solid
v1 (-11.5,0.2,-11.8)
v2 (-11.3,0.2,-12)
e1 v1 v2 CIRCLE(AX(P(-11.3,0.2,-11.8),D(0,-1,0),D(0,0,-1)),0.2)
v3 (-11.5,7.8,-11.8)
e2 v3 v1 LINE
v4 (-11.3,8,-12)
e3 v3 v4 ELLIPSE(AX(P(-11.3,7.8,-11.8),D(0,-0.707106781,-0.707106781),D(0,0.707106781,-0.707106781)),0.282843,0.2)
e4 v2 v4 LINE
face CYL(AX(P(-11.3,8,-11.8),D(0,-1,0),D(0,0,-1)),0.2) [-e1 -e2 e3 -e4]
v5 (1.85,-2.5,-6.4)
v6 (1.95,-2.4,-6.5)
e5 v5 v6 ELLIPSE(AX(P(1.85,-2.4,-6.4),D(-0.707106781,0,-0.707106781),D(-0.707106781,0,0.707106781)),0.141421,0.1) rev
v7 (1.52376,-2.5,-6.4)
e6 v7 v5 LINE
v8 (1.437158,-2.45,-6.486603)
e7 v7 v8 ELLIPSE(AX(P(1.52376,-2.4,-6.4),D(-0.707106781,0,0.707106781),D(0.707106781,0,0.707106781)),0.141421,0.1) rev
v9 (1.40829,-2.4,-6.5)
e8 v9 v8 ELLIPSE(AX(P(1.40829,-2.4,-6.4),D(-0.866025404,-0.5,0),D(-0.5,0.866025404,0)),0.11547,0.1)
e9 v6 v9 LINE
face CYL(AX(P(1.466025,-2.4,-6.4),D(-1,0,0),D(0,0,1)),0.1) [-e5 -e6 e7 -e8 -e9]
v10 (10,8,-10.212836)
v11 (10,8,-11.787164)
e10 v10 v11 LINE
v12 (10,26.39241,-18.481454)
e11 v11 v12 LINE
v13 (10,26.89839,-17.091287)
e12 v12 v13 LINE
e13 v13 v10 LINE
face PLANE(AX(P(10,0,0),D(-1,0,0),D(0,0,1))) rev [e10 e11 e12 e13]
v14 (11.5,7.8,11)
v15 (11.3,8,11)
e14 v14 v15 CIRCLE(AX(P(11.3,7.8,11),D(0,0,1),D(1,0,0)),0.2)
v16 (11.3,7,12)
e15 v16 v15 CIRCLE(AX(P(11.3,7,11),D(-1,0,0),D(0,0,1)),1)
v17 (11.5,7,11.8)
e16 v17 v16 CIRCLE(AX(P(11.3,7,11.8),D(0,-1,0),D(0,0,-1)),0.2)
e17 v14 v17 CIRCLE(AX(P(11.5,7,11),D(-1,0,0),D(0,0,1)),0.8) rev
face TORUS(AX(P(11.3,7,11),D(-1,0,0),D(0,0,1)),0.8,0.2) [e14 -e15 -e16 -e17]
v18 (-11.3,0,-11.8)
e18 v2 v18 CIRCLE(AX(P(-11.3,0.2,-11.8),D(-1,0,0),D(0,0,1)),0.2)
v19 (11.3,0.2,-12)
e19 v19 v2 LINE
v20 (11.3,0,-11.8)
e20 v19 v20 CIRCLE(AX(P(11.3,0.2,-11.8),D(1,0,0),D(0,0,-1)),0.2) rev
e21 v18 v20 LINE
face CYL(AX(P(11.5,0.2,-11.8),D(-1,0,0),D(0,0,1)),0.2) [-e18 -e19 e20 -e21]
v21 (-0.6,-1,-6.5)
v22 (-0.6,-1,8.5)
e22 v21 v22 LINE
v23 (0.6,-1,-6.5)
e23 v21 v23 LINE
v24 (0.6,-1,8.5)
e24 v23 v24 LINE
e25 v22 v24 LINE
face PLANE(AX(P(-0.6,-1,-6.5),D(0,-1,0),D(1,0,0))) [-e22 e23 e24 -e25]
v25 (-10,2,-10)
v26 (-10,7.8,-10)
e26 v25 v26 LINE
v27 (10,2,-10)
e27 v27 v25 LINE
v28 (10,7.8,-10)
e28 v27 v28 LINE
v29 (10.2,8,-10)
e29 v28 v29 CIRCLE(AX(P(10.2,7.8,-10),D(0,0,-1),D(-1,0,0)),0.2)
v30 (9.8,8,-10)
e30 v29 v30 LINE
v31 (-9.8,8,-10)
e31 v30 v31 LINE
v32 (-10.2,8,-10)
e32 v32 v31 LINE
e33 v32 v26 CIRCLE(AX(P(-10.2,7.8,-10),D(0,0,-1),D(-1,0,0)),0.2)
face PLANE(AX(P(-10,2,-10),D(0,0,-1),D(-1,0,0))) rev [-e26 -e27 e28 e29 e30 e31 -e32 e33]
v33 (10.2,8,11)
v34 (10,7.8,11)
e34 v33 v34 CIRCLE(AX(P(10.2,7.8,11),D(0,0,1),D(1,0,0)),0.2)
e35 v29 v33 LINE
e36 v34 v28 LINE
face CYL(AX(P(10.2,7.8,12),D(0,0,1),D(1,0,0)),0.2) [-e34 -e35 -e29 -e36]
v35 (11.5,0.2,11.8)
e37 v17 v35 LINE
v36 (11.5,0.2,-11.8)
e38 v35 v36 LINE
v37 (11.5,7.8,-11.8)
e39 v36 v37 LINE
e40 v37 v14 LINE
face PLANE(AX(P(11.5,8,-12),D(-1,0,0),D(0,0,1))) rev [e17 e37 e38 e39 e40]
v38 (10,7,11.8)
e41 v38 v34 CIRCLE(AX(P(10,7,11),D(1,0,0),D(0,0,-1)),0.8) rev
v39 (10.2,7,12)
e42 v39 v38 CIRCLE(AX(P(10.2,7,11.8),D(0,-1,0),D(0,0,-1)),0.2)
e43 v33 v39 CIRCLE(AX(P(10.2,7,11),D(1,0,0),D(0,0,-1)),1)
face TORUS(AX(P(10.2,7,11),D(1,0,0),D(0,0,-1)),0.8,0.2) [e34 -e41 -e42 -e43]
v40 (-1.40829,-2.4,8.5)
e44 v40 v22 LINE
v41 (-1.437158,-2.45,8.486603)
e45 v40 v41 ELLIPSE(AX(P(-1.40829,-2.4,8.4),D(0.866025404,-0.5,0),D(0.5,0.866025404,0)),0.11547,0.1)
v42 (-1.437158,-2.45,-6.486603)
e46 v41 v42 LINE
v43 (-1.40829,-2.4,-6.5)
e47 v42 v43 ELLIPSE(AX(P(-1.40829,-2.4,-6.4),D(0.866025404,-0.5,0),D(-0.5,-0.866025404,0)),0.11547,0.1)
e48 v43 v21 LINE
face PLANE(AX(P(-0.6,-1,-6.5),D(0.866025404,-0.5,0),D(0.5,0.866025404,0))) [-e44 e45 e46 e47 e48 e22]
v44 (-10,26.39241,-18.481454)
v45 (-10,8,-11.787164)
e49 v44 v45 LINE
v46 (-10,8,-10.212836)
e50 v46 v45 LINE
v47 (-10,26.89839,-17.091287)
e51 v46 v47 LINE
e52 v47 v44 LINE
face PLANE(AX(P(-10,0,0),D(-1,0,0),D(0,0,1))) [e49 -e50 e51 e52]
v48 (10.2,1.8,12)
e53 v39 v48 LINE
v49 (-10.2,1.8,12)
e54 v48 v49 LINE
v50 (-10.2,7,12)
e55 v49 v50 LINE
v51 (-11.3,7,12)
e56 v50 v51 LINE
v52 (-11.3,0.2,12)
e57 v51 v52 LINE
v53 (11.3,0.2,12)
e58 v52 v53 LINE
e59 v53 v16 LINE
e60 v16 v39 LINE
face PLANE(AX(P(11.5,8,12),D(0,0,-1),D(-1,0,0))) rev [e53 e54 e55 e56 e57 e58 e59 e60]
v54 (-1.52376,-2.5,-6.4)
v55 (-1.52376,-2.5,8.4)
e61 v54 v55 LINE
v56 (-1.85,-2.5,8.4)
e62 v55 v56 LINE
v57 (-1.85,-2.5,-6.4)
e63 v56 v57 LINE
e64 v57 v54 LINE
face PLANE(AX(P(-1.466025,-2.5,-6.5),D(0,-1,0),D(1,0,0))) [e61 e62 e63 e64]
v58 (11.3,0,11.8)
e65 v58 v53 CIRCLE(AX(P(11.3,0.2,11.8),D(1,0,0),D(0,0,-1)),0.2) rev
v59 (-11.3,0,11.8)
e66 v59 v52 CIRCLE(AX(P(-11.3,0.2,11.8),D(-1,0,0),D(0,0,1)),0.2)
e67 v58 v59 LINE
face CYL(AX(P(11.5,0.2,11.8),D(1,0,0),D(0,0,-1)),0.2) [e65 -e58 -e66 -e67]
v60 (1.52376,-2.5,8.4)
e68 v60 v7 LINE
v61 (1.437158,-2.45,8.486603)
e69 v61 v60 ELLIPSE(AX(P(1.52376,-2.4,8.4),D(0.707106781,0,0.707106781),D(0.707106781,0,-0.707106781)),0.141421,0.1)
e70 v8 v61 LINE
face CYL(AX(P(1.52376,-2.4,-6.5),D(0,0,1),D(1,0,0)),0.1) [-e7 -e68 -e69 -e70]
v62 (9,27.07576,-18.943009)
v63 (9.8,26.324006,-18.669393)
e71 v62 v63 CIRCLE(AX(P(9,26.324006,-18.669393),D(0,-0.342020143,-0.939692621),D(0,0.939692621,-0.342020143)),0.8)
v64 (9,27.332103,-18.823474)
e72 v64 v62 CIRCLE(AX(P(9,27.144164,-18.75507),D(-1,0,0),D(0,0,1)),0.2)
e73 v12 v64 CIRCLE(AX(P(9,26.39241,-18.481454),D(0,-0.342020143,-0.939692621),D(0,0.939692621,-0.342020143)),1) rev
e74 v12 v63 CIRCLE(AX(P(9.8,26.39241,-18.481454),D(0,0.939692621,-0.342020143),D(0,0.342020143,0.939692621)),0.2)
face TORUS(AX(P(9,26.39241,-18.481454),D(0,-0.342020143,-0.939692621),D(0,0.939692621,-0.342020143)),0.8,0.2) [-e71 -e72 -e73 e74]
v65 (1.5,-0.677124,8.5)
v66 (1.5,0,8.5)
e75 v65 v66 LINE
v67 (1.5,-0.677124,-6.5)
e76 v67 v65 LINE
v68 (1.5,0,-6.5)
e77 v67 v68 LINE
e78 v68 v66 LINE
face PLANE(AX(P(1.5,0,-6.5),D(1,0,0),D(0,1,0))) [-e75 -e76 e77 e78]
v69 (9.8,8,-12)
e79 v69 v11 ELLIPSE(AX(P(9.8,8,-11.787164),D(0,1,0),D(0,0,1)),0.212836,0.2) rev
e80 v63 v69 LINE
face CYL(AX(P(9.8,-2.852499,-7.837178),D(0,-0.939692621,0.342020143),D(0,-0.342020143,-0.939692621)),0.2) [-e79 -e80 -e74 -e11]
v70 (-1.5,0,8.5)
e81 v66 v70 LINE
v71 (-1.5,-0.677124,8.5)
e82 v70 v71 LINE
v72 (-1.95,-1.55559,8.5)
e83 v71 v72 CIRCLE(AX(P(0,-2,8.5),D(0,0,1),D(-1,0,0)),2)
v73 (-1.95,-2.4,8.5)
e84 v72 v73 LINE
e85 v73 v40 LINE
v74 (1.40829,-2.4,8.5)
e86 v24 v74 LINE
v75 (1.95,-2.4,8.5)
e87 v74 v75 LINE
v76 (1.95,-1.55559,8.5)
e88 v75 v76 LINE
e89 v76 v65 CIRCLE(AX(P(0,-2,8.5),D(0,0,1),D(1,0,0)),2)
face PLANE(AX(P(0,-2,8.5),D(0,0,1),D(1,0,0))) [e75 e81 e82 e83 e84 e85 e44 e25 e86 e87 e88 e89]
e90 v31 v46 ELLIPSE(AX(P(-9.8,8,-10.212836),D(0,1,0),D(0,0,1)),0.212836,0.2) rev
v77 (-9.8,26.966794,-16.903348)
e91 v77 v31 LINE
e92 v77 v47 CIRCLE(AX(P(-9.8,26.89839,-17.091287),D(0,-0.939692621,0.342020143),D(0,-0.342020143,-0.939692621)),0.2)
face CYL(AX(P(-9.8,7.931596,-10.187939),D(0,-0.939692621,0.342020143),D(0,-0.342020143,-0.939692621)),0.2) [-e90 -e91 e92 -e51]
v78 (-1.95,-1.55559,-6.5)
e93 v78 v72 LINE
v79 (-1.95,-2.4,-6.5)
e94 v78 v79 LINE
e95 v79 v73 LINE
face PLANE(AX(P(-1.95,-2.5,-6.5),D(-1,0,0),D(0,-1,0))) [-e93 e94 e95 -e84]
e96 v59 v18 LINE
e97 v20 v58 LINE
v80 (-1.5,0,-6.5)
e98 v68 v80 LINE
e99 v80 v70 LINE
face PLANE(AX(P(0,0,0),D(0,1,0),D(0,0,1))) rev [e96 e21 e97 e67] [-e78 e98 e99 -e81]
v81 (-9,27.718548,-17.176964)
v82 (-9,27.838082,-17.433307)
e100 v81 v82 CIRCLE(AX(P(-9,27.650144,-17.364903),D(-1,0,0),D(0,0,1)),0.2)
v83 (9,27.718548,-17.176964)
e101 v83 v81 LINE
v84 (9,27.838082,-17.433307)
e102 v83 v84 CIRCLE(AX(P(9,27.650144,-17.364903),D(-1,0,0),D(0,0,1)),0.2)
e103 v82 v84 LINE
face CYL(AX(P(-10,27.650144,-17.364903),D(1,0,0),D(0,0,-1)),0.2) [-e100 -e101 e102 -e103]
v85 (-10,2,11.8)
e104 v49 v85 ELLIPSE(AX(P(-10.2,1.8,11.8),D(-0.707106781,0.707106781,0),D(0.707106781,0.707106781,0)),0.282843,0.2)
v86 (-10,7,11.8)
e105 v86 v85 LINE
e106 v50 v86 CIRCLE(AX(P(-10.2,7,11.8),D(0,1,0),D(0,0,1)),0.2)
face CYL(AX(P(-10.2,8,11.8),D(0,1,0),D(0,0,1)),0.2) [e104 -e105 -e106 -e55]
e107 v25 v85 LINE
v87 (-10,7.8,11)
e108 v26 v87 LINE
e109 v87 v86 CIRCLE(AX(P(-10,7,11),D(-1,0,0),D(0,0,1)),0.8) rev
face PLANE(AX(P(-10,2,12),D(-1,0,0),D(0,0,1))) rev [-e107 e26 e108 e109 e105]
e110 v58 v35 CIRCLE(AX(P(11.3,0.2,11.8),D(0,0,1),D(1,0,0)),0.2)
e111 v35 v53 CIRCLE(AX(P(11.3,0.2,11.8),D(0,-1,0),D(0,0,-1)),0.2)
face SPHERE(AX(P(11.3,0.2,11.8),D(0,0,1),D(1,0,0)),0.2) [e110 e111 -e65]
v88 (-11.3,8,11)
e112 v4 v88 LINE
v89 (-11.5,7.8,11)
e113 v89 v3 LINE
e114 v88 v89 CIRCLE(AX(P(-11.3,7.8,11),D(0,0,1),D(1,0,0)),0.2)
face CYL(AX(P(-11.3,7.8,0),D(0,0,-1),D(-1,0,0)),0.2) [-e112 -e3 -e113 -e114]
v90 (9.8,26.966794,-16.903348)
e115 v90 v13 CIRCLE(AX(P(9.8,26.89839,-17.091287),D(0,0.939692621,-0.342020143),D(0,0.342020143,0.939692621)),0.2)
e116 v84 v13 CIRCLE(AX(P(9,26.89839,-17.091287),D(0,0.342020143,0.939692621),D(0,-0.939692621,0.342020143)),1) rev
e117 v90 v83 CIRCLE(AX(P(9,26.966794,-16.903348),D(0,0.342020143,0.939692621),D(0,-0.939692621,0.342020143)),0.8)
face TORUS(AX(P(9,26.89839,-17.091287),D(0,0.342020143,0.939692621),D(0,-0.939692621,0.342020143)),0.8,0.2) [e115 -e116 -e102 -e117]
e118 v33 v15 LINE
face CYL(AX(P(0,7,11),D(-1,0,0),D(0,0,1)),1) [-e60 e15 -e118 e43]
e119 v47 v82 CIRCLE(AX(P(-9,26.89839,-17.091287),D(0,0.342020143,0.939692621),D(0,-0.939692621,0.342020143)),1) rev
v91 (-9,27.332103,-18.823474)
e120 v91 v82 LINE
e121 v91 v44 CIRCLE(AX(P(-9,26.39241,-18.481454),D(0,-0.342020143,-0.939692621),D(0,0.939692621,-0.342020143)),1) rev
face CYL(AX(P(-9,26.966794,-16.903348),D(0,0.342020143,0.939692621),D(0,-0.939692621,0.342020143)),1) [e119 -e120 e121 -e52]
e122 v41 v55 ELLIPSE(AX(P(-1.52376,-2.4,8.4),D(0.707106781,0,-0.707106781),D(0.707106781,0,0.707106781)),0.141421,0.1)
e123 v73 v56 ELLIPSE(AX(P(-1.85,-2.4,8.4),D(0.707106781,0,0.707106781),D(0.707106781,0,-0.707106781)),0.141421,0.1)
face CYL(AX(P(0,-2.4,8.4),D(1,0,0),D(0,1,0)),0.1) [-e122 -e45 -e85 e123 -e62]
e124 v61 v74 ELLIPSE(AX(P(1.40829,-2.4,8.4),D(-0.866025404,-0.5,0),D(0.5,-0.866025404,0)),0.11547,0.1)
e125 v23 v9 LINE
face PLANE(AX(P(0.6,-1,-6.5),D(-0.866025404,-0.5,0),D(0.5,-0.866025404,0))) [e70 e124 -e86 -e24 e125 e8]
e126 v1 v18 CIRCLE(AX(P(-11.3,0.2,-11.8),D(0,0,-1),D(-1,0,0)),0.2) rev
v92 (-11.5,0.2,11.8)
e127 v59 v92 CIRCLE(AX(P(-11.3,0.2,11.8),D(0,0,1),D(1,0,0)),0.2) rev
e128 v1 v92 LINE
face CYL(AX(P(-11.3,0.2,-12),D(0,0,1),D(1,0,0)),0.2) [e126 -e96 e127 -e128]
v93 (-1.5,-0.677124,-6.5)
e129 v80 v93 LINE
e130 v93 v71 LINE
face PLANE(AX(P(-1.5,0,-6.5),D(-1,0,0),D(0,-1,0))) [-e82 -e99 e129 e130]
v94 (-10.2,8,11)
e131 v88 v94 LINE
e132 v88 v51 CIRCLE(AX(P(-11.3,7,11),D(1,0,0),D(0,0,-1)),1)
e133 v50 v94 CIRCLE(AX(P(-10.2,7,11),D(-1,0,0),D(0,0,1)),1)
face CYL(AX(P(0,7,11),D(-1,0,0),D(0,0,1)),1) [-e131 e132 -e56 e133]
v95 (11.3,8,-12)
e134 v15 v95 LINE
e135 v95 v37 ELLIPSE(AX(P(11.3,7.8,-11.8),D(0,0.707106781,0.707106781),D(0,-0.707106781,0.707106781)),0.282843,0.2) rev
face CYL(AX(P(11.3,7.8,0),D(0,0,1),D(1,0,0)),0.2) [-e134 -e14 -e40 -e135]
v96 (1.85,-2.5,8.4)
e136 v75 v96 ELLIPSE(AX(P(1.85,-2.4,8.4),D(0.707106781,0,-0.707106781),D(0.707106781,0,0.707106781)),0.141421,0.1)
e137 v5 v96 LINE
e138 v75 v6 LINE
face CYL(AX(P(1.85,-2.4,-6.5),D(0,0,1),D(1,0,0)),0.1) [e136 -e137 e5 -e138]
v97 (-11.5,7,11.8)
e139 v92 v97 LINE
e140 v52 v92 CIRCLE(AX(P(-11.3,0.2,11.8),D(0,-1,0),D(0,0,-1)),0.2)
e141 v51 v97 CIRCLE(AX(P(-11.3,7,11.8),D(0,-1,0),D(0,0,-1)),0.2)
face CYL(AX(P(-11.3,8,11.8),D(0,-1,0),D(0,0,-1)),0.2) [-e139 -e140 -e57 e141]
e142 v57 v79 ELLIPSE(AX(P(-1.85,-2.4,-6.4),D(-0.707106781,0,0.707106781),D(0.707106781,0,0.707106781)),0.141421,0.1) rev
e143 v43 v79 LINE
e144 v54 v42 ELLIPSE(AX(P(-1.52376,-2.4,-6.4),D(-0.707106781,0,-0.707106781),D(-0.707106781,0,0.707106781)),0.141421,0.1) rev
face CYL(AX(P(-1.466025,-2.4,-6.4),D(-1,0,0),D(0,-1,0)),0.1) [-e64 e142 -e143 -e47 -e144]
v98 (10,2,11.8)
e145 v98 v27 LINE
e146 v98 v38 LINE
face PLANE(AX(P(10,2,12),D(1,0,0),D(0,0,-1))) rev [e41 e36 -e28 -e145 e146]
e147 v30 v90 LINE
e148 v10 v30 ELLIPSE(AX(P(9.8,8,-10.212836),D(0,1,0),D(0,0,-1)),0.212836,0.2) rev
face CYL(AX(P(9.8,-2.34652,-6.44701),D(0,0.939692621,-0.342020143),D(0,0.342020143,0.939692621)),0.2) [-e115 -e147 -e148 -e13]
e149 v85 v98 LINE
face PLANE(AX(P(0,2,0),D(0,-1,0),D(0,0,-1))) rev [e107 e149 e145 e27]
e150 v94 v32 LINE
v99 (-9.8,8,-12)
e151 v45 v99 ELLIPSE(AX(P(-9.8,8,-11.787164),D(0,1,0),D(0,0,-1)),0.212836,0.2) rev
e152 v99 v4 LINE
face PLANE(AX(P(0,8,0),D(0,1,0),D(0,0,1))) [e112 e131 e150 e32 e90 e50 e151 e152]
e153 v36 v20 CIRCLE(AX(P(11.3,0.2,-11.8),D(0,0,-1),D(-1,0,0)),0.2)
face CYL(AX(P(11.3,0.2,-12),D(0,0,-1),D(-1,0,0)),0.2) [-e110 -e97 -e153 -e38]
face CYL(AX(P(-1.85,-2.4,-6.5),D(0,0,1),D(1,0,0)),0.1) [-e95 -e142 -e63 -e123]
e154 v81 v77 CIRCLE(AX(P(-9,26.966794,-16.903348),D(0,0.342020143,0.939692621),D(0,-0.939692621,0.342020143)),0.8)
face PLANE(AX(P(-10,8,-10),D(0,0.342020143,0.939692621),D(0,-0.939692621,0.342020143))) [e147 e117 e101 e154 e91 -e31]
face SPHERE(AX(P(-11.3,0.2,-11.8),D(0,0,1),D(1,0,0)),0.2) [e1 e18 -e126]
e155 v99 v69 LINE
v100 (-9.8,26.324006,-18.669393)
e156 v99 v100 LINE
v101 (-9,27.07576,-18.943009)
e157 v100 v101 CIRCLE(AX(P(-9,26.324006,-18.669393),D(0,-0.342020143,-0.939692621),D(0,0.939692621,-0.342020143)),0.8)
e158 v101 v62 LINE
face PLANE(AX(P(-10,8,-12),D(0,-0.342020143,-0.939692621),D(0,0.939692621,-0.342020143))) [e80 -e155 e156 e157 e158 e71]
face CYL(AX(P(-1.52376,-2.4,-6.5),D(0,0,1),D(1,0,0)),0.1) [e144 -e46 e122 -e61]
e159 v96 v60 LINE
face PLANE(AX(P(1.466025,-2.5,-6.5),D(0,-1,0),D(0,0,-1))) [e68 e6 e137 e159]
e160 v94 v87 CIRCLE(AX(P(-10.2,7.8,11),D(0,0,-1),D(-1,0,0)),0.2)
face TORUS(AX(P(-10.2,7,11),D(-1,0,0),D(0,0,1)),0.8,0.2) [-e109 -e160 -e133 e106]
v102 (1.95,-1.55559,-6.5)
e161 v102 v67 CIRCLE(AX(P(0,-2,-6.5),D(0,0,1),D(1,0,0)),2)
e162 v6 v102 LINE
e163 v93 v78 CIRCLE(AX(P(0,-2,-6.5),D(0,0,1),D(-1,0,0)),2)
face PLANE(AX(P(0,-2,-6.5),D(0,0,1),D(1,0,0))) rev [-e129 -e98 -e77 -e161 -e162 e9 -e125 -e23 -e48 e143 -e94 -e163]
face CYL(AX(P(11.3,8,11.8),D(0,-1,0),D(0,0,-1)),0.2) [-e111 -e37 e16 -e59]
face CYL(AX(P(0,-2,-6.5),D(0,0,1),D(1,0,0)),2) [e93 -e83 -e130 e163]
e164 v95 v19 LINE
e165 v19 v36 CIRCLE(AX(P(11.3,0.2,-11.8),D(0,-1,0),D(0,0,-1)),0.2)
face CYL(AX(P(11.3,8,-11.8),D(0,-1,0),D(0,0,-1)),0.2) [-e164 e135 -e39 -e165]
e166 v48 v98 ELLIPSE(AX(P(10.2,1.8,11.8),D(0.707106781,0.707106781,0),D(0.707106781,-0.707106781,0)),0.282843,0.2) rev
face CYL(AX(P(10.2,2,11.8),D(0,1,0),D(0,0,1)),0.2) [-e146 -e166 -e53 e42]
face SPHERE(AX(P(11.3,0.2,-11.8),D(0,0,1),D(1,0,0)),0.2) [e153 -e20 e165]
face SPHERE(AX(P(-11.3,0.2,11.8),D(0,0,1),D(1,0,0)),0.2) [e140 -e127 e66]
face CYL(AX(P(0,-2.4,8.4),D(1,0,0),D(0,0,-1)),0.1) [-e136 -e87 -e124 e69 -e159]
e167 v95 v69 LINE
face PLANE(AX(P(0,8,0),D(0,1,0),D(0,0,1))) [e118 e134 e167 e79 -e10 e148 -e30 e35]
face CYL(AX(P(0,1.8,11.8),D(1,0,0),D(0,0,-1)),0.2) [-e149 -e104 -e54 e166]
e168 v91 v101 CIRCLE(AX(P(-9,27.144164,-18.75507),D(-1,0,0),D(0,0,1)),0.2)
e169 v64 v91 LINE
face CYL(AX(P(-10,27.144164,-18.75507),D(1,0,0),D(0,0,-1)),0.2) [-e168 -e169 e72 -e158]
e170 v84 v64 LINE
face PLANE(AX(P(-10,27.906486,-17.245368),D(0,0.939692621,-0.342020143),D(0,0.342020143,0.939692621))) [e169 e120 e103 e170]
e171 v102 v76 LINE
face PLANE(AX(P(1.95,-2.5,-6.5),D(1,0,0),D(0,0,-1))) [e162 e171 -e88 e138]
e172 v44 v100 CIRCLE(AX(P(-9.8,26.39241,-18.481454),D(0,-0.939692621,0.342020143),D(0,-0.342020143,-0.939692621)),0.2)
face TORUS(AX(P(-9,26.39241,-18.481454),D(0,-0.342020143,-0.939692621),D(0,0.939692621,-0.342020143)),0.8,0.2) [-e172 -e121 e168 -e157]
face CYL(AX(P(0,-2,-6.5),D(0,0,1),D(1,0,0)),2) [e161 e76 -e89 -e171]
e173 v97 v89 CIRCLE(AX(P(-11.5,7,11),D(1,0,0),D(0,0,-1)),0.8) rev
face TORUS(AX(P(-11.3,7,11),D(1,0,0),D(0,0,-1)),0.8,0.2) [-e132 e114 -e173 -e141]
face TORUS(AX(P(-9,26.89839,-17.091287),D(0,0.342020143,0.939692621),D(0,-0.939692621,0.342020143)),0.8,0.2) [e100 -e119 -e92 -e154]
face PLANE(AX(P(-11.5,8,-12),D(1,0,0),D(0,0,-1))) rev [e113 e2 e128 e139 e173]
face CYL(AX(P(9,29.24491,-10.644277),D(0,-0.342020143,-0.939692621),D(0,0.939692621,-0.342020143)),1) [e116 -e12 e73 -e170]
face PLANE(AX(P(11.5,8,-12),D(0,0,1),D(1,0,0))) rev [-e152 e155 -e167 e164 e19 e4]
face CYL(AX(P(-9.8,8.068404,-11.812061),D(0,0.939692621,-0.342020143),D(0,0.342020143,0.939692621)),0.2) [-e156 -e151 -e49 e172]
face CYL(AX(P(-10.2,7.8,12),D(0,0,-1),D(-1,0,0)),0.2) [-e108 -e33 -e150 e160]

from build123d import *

# Parameters (mm, degrees)
SKETCH_1_W           = 23
SKETCH_1_H           = 24
EXTRUDE_1_DEPTH      = 8
SKETCH_2_W           = 20
SKETCH_2_H           = 22
CUT_EXTRUDE_1_DEPTH  = 6
EXTRUDE_3_DEPTH      = 10
EXTRUDE_3_DEPTH_BACK = 10
EXTRUDE_START        = -3.5
EXTRUDE_4_DEPTH      = 15
FILLET_1_R           = 1
FILLET_3_R           = 0.2
FILLET_4_R           = 0.2
FILLET_6_R           = 0.1


with BuildPart() as part:
    # 草图1 → 凸台-拉伸1 (new body)
    with BuildSketch(Plane(origin=(0, 0, 0), x_dir=(1, 0, 0), z_dir=(0, 1, 0))):
        Rectangle(SKETCH_1_W, SKETCH_1_H)
    extrude(amount=EXTRUDE_1_DEPTH)

    # 草图2 → 切除-拉伸1 (cut)
    with BuildSketch(Plane(origin=(0, 8, 0), x_dir=(1, 0, 0), z_dir=(0, 1, 0))):
        with Locations((0, -1)):
            Rectangle(SKETCH_2_W, SKETCH_2_H)
    extrude(amount=-CUT_EXTRUDE_1_DEPTH, mode=Mode.SUBTRACT)

    # 草图3 → 凸台-拉伸3 (add, two sides: drawn at the far end of the back side and taken through both)
    with BuildSketch(Plane(origin=(0, 0, 0), x_dir=(0, 0, -1), z_dir=(1, 0, 0)).offset(-EXTRUDE_3_DEPTH_BACK)):
        Polygon((12, 8), (19.011412938, 27.263698726), (17.245368495, 27.906486336), (10, 8), align=None)
    extrude(amount=EXTRUDE_3_DEPTH + EXTRUDE_3_DEPTH_BACK)

    # 草图4 → 凸台-拉伸4 (add)
    with BuildSketch(Plane.XY.offset(12).offset(EXTRUDE_START)):
        with BuildLine():
            Line((-1.5, 0), (1.5, 0))
            Line((1.5, 0), (1.5, -0.677124344))
            ThreePointArc((1.5, -0.677124344), (1.780042303, -1.088161527), (1.95, -1.555590279))
            Line((1.95, -1.555590279), (1.95, -2.5))
            Line((1.95, -2.5), (1.466025404, -2.5))
            Line((1.466025404, -2.5), (0.6, -1))
            Line((0.6, -1), (-0.6, -1))
            Line((-0.6, -1), (-1.466025404, -2.5))
            Line((-1.466025404, -2.5), (-1.95, -2.5))
            Line((-1.95, -2.5), (-1.95, -1.555590279))
            ThreePointArc((-1.95, -1.555590279), (-1.780042303, -1.088161527), (-1.5, -0.677124344))
            Line((-1.5, -0.677124344), (-1.5, 0))
        make_face()
    extrude(amount=-EXTRUDE_4_DEPTH)

    # 圆角1
    fillet_1_edges = [part.edges().sort_by_distance(p)[0] for p in [
        (-10.75, 8, 12),
        (10.75, 8, 12),
        (-10, 27.585092531, -18.128390717),
        (10, 27.585092531, -18.128390717),
    ]]
    fillet(fillet_1_edges, radius=FILLET_1_R)

    # 圆角3
    # the kernel refuses this fillet: 0.2 mm, written as the material it takes off along each edge
    with BuildSketch(Plane(origin=(-11.3, 0.2, 11.8), x_dir=(0, -1, 0), z_dir=(0, 0, 1))) as fillet_3_piece_1_section:
        Polygon((0, 0), (FILLET_3_R * 1.02, 0), (FILLET_3_R * 1.02, -FILLET_3_R * 1.02), (0, -FILLET_3_R * 1.02), align=None)
    fillet_3_piece_1 = extrude(amount=FILLET_3_R * 1.02, mode=Mode.PRIVATE)
    fillet_3_piece_1 = fillet_3_piece_1 - Plane(origin=(-11.3, 0.2, 11.8), x_dir=(0.7071067811865475, 0.7071067811865475, 0), z_dir=(0, 0, 1)) * Sphere(FILLET_3_R, mode=Mode.PRIVATE)
    add(fillet_3_piece_1, mode=Mode.SUBTRACT)
    with BuildSketch(Plane(origin=(-11.3, 0.2, -11.8), x_dir=(0, 0, -1), z_dir=(0, -1, 0))) as fillet_3_piece_2_section:
        Polygon((0, 0), (FILLET_3_R * 1.02, 0), (FILLET_3_R * 1.02, -FILLET_3_R * 1.02), (0, -FILLET_3_R * 1.02), align=None)
    fillet_3_piece_2 = extrude(amount=FILLET_3_R * 1.02, mode=Mode.PRIVATE)
    fillet_3_piece_2 = fillet_3_piece_2 - Plane(origin=(-11.3, 0.2, -11.8), x_dir=(0.7071067811865477, 0, 0.7071067811865475), z_dir=(0, -1, 0)) * Sphere(FILLET_3_R, mode=Mode.PRIVATE)
    add(fillet_3_piece_2, mode=Mode.SUBTRACT)
    with BuildSketch(Plane(origin=(11.3, 0.2, -11.8), x_dir=(0, -1, 0), z_dir=(1, 0, 0))) as fillet_3_piece_3_section:
        Polygon((0, 0), (FILLET_3_R * 1.02, 0), (FILLET_3_R * 1.02, FILLET_3_R * 1.02), (0, FILLET_3_R * 1.02), align=None)
    fillet_3_piece_3 = extrude(amount=FILLET_3_R * 1.02, mode=Mode.PRIVATE)
    fillet_3_piece_3 = fillet_3_piece_3 - Plane(origin=(11.3, 0.2, -11.8), x_dir=(0, 0.7071067811865475, 0.7071067811865475), z_dir=(1, 0, 0)) * Sphere(FILLET_3_R, mode=Mode.PRIVATE)
    add(fillet_3_piece_3, mode=Mode.SUBTRACT)
    with BuildSketch(Plane(origin=(11.3, 0.2, 11.8), x_dir=(0, 0, 1), z_dir=(1, 0, 0))) as fillet_3_piece_4_section:
        Polygon((0, 0), (FILLET_3_R * 1.02, 0), (FILLET_3_R * 1.02, FILLET_3_R * 1.02), (0, FILLET_3_R * 1.02), align=None)
    fillet_3_piece_4 = extrude(amount=FILLET_3_R * 1.02, mode=Mode.PRIVATE)
    fillet_3_piece_4 = fillet_3_piece_4 - Plane(origin=(11.3, 0.2, 11.8), x_dir=(0, 0.7071067811865475, -0.7071067811865475), z_dir=(1, 0, 0)) * Sphere(FILLET_3_R, mode=Mode.PRIVATE)
    add(fillet_3_piece_4, mode=Mode.SUBTRACT)
    with BuildSketch(Plane(origin=(-10, 8, -10), x_dir=(0, -1, 0), z_dir=(0, 0, 1))) as fillet_3_piece_5_section:
        with BuildLine():
            CenterArc((FILLET_3_R, -FILLET_3_R), FILLET_3_R, 90, 90)
            Line((0, -FILLET_3_R), (-FILLET_3_R * 0.02, -FILLET_3_R))
            Line((-FILLET_3_R * 0.02, -FILLET_3_R), (-FILLET_3_R * 0.02, FILLET_3_R * 0.02))
            Line((-FILLET_3_R * 0.02, FILLET_3_R * 0.02), (FILLET_3_R, FILLET_3_R * 0.02))
            Line((FILLET_3_R, FILLET_3_R * 0.02), (FILLET_3_R, 0))
        make_face()
    fillet_3_piece_5 = extrude(amount=21, mode=Mode.PRIVATE)
    fillet_3_piece_5 = split(fillet_3_piece_5, bisect_by=Plane(origin=(-10, 7.959305374, 0.5), z_dir=(-1, 0, 0)), keep=Keep.TOP, mode=Mode.PRIVATE)
    add(fillet_3_piece_5, mode=Mode.SUBTRACT)
    with BuildSketch(Plane(origin=(-10, 7, 11), x_dir=(0, 0, 1), z_dir=(0, -1, 0))) as fillet_3_piece_6:
        with BuildLine():
            CenterArc((1 - FILLET_3_R, FILLET_3_R), FILLET_3_R, 270, 90)
            Line((1 - FILLET_3_R, 0), (1 - FILLET_3_R, -FILLET_3_R * 0.02))
            Line((1 - FILLET_3_R, -FILLET_3_R * 0.02), (1 + FILLET_3_R * 0.02, -FILLET_3_R * 0.02))
            Line((1 + FILLET_3_R * 0.02, -FILLET_3_R * 0.02), (1 + FILLET_3_R * 0.02, FILLET_3_R))
            Line((1 + FILLET_3_R * 0.02, FILLET_3_R), (1, FILLET_3_R))
        make_face()
    revolve(axis=Axis((-10, 7, 11), (-1, 0, 0)), revolution_arc=90, mode=Mode.SUBTRACT)
    with BuildSketch(Plane(origin=(10, 8, 11), x_dir=(1, 0, 0), z_dir=(0, 0, -1))) as fillet_3_piece_7_section:
        with BuildLine():
            CenterArc((FILLET_3_R, FILLET_3_R), FILLET_3_R, 180, 90)
            Line((0, FILLET_3_R), (-FILLET_3_R * 0.02, FILLET_3_R))
            Line((-FILLET_3_R * 0.02, FILLET_3_R), (-FILLET_3_R * 0.02, -FILLET_3_R * 0.02))
            Line((-FILLET_3_R * 0.02, -FILLET_3_R * 0.02), (FILLET_3_R, -FILLET_3_R * 0.02))
            Line((FILLET_3_R, -FILLET_3_R * 0.02), (FILLET_3_R, 0))
        make_face()
    fillet_3_piece_7 = extrude(amount=21, mode=Mode.PRIVATE)
    fillet_3_piece_7 = split(fillet_3_piece_7, bisect_by=Plane(origin=(10, 7.959305374, 0.5), z_dir=(1, 0, 0)), keep=Keep.TOP, mode=Mode.PRIVATE)
    add(fillet_3_piece_7, mode=Mode.SUBTRACT)
    with BuildSketch(Plane(origin=(10, 7, 11), x_dir=(0, 0, 1), z_dir=(0, -1, 0))) as fillet_3_piece_8:
        with BuildLine():
            CenterArc((1 - FILLET_3_R, -FILLET_3_R), FILLET_3_R, 0, 90)
            Line((1 - FILLET_3_R, 0), (1 - FILLET_3_R, FILLET_3_R * 0.02))
            Line((1 - FILLET_3_R, FILLET_3_R * 0.02), (1 + FILLET_3_R * 0.02, FILLET_3_R * 0.02))
            Line((1 + FILLET_3_R * 0.02, FILLET_3_R * 0.02), (1 + FILLET_3_R * 0.02, -FILLET_3_R))
            Line((1 + FILLET_3_R * 0.02, -FILLET_3_R), (1, -FILLET_3_R))
        make_face()
    revolve(axis=Axis((10, 7, 11), (-1, 0, 0)), revolution_arc=90, mode=Mode.SUBTRACT)
    with BuildSketch(Plane(origin=(-11.5, 0, 11.8), x_dir=(1, 0, 0), z_dir=(0, 0, -1))) as fillet_3_piece_9:
        with BuildLine():
            CenterArc((FILLET_3_R, -FILLET_3_R), FILLET_3_R, 90, 90)
            Line((0, -FILLET_3_R), (-FILLET_3_R * 0.02, -FILLET_3_R))
            Line((-FILLET_3_R * 0.02, -FILLET_3_R), (-FILLET_3_R * 0.02, FILLET_3_R * 0.02))
            Line((-FILLET_3_R * 0.02, FILLET_3_R * 0.02), (FILLET_3_R, FILLET_3_R * 0.02))
            Line((FILLET_3_R, FILLET_3_R * 0.02), (FILLET_3_R, 0))
        make_face()
    extrude(amount=23.6, mode=Mode.SUBTRACT)
    with BuildSketch(Plane(origin=(-11.5, 0.2, -12), x_dir=(1, 0, 0), z_dir=(0, 1, 0)), Plane(origin=(11.5, 0.2, -12), x_dir=(0, 0, 1), z_dir=(0, 1, 0))) as fillet_3_piece_10:
        with BuildLine():
            CenterArc((FILLET_3_R, -FILLET_3_R), FILLET_3_R, 90, 90)
            Line((0, -FILLET_3_R), (-FILLET_3_R * 0.02, -FILLET_3_R))
            Line((-FILLET_3_R * 0.02, -FILLET_3_R), (-FILLET_3_R * 0.02, FILLET_3_R * 0.02))
            Line((-FILLET_3_R * 0.02, FILLET_3_R * 0.02), (FILLET_3_R, FILLET_3_R * 0.02))
            Line((FILLET_3_R, FILLET_3_R * 0.02), (FILLET_3_R, 0))
        make_face()
    extrude(amount=7.8, mode=Mode.SUBTRACT)
    with BuildSketch(Plane(origin=(-11.5, 8, 11), x_dir=(0, -1, 0), z_dir=(0, 0, -1)), Plane(origin=(11.5, 8, -12), x_dir=(0, -1, 0), z_dir=(0, 0, 1))) as fillet_3_piece_11:
        with BuildLine():
            CenterArc((FILLET_3_R, -FILLET_3_R), FILLET_3_R, 90, 90)
            Line((0, -FILLET_3_R), (-FILLET_3_R * 0.02, -FILLET_3_R))
            Line((-FILLET_3_R * 0.02, -FILLET_3_R), (-FILLET_3_R * 0.02, FILLET_3_R * 0.02))
            Line((-FILLET_3_R * 0.02, FILLET_3_R * 0.02), (FILLET_3_R, FILLET_3_R * 0.02))
            Line((FILLET_3_R, FILLET_3_R * 0.02), (FILLET_3_R, 0))
        make_face()
    extrude(amount=23, mode=Mode.SUBTRACT)
    with BuildSketch(Plane(origin=(-11.5, 7, 11), x_dir=(0, 0, 1), z_dir=(0, -1, 0))) as fillet_3_piece_12:
        with BuildLine():
            CenterArc((1 - FILLET_3_R, -FILLET_3_R), FILLET_3_R, 0, 90)
            Line((1, -FILLET_3_R), (1 + FILLET_3_R * 0.02, -FILLET_3_R))
            Line((1 + FILLET_3_R * 0.02, -FILLET_3_R), (1 + FILLET_3_R * 0.02, FILLET_3_R * 0.02))
            Line((1 + FILLET_3_R * 0.02, FILLET_3_R * 0.02), (1 - FILLET_3_R, FILLET_3_R * 0.02))
            Line((1 - FILLET_3_R, FILLET_3_R * 0.02), (1 - FILLET_3_R, 0))
        make_face()
    revolve(axis=Axis((-11.5, 7, 11), (-1, 0, 0)), revolution_arc=90, mode=Mode.SUBTRACT)
    with BuildSketch(Plane(origin=(11.5, 0, -11.8), x_dir=(0, 1, 0), z_dir=(0, 0, 1))) as fillet_3_piece_13:
        with BuildLine():
            CenterArc((FILLET_3_R, FILLET_3_R), FILLET_3_R, 180, 90)
            Line((0, FILLET_3_R), (-FILLET_3_R * 0.02, FILLET_3_R))
            Line((-FILLET_3_R * 0.02, FILLET_3_R), (-FILLET_3_R * 0.02, -FILLET_3_R * 0.02))
            Line((-FILLET_3_R * 0.02, -FILLET_3_R * 0.02), (FILLET_3_R, -FILLET_3_R * 0.02))
            Line((FILLET_3_R, -FILLET_3_R * 0.02), (FILLET_3_R, 0))
        make_face()
    extrude(amount=23.6, mode=Mode.SUBTRACT)
    with BuildSketch(Plane(origin=(11.5, 7, 11), x_dir=(0, 0, 1), z_dir=(0, -1, 0))) as fillet_3_piece_14:
        with BuildLine():
            CenterArc((1 - FILLET_3_R, FILLET_3_R), FILLET_3_R, 270, 90)
            Line((1, FILLET_3_R), (1 + FILLET_3_R * 0.02, FILLET_3_R))
            Line((1 + FILLET_3_R * 0.02, FILLET_3_R), (1 + FILLET_3_R * 0.02, -FILLET_3_R * 0.02))
            Line((1 + FILLET_3_R * 0.02, -FILLET_3_R * 0.02), (1 - FILLET_3_R, -FILLET_3_R * 0.02))
            Line((1 - FILLET_3_R, -FILLET_3_R * 0.02), (1 - FILLET_3_R, 0))
        make_face()
    revolve(axis=Axis((11.5, 7, 11), (-1, 0, 0)), revolution_arc=90, mode=Mode.SUBTRACT)
    with BuildSketch(Plane(origin=(11.3, 0, 12), x_dir=(0, 1, 0), z_dir=(-1, 0, 0))) as fillet_3_piece_15:
        with BuildLine():
            CenterArc((FILLET_3_R, FILLET_3_R), FILLET_3_R, 180, 90)
            Line((0, FILLET_3_R), (-FILLET_3_R * 0.02, FILLET_3_R))
            Line((-FILLET_3_R * 0.02, FILLET_3_R), (-FILLET_3_R * 0.02, -FILLET_3_R * 0.02))
            Line((-FILLET_3_R * 0.02, -FILLET_3_R * 0.02), (FILLET_3_R, -FILLET_3_R * 0.02))
            Line((FILLET_3_R, -FILLET_3_R * 0.02), (FILLET_3_R, 0))
        make_face()
    extrude(amount=22.6, mode=Mode.SUBTRACT)
    with BuildSketch(Plane(origin=(-11.5, 0.2, 12), x_dir=(1, 0, 0), z_dir=(0, 1, 0)), Plane(origin=(11.5, 0.2, 12), x_dir=(0, 0, -1), z_dir=(0, 1, 0))) as fillet_3_piece_16:
        with BuildLine():
            CenterArc((FILLET_3_R, FILLET_3_R), FILLET_3_R, 180, 90)
            Line((0, FILLET_3_R), (-FILLET_3_R * 0.02, FILLET_3_R))
            Line((-FILLET_3_R * 0.02, FILLET_3_R), (-FILLET_3_R * 0.02, -FILLET_3_R * 0.02))
            Line((-FILLET_3_R * 0.02, -FILLET_3_R * 0.02), (FILLET_3_R, -FILLET_3_R * 0.02))
            Line((FILLET_3_R, -FILLET_3_R * 0.02), (FILLET_3_R, 0))
        make_face()
    extrude(amount=6.8, mode=Mode.SUBTRACT)
    with BuildSketch(Plane(origin=(-10, 7, 12), x_dir=(-1, 0, 0), z_dir=(0, -1, 0))) as fillet_3_piece_17:
        with BuildLine():
            CenterArc((FILLET_3_R, FILLET_3_R), FILLET_3_R, 180, 90)
            Line((0, FILLET_3_R), (-FILLET_3_R * 0.02, FILLET_3_R))
            Line((-FILLET_3_R * 0.02, FILLET_3_R), (-FILLET_3_R * 0.02, -FILLET_3_R * 0.02))
            Line((-FILLET_3_R * 0.02, -FILLET_3_R * 0.02), (FILLET_3_R, -FILLET_3_R * 0.02))
            Line((FILLET_3_R, -FILLET_3_R * 0.02), (FILLET_3_R, 0))
        make_face()
    extrude(amount=5, mode=Mode.SUBTRACT)
    with BuildSketch(Plane(origin=(-10, 2, 12), x_dir=(0, -1, 0), z_dir=(1, 0, 0))) as fillet_3_piece_18:
        with BuildLine():
            CenterArc((FILLET_3_R, FILLET_3_R), FILLET_3_R, 180, 90)
            Line((0, FILLET_3_R), (-FILLET_3_R * 0.02, FILLET_3_R))
            Line((-FILLET_3_R * 0.02, FILLET_3_R), (-FILLET_3_R * 0.02, -FILLET_3_R * 0.02))
            Line((-FILLET_3_R * 0.02, -FILLET_3_R * 0.02), (FILLET_3_R, -FILLET_3_R * 0.02))
            Line((FILLET_3_R, -FILLET_3_R * 0.02), (FILLET_3_R, 0))
        make_face()
    extrude(amount=20, mode=Mode.SUBTRACT)
    with BuildSketch(Plane(origin=(10, 7, 12), x_dir=(1, 0, 0), z_dir=(0, -1, 0))) as fillet_3_piece_19:
        with BuildLine():
            CenterArc((FILLET_3_R, -FILLET_3_R), FILLET_3_R, 90, 90)
            Line((0, -FILLET_3_R), (-FILLET_3_R * 0.02, -FILLET_3_R))
            Line((-FILLET_3_R * 0.02, -FILLET_3_R), (-FILLET_3_R * 0.02, FILLET_3_R * 0.02))
            Line((-FILLET_3_R * 0.02, FILLET_3_R * 0.02), (FILLET_3_R, FILLET_3_R * 0.02))
            Line((FILLET_3_R, FILLET_3_R * 0.02), (FILLET_3_R, 0))
        make_face()
    extrude(amount=5, mode=Mode.SUBTRACT)
    with BuildSketch(Plane(origin=(-11.3, 0, -12), x_dir=(0, 0, 1), z_dir=(1, 0, 0))) as fillet_3_piece_20:
        with BuildLine():
            CenterArc((FILLET_3_R, -FILLET_3_R), FILLET_3_R, 90, 90)
            Line((0, -FILLET_3_R), (-FILLET_3_R * 0.02, -FILLET_3_R))
            Line((-FILLET_3_R * 0.02, -FILLET_3_R), (-FILLET_3_R * 0.02, FILLET_3_R * 0.02))
            Line((-FILLET_3_R * 0.02, FILLET_3_R * 0.02), (FILLET_3_R, FILLET_3_R * 0.02))
            Line((FILLET_3_R, FILLET_3_R * 0.02), (FILLET_3_R, 0))
        make_face()
    extrude(amount=22.6, mode=Mode.SUBTRACT)
    with BuildSketch(Plane(origin=(-11.5, 0.2, -12), x_dir=(1, 0, 0), z_dir=(0, 1, 0))) as fillet_3_piece_21a_section:
        with BuildLine():
            CenterArc((FILLET_3_R, -FILLET_3_R), FILLET_3_R, 90, 90)
            Line((0, -FILLET_3_R), (-FILLET_3_R * 0.02, -FILLET_3_R))
            Line((-FILLET_3_R * 0.02, -FILLET_3_R), (-FILLET_3_R * 0.02, FILLET_3_R * 0.02))
            Line((-FILLET_3_R * 0.02, FILLET_3_R * 0.02), (FILLET_3_R, FILLET_3_R * 0.02))
            Line((FILLET_3_R, FILLET_3_R * 0.02), (FILLET_3_R, 0))
        make_face()
    fillet_3_piece_21a = extrude(amount=8.3, mode=Mode.PRIVATE)
    fillet_3_piece_21a = split(fillet_3_piece_21a, bisect_by=Plane(origin=(-11.454720977, 8, -11.954720977), z_dir=(0, 1, 0)), keep=Keep.TOP, mode=Mode.PRIVATE)
    with BuildSketch(Plane(origin=(-11.5, 8, 11), x_dir=(0, -1, 0), z_dir=(0, 0, -1))) as fillet_3_piece_21b_section:
        with BuildLine():
            CenterArc((FILLET_3_R, -FILLET_3_R), FILLET_3_R, 90, 90)
            Line((0, -FILLET_3_R), (-FILLET_3_R * 0.02, -FILLET_3_R))
            Line((-FILLET_3_R * 0.02, -FILLET_3_R), (-FILLET_3_R * 0.02, FILLET_3_R * 0.02))
            Line((-FILLET_3_R * 0.02, FILLET_3_R * 0.02), (FILLET_3_R, FILLET_3_R * 0.02))
            Line((FILLET_3_R, FILLET_3_R * 0.02), (FILLET_3_R, 0))
        make_face()
    fillet_3_piece_21b = extrude(amount=23.5, mode=Mode.PRIVATE)
    fillet_3_piece_21b = split(fillet_3_piece_21b, bisect_by=Plane(origin=(-11.454720977, 7.954720977, -12), z_dir=(0, 0, -1)), keep=Keep.TOP, mode=Mode.PRIVATE)
    fillet_3_piece_21 = fillet_3_piece_21a & fillet_3_piece_21b
    add(fillet_3_piece_21, mode=Mode.SUBTRACT)
    with BuildSketch(Plane(origin=(11.5, 8, -12.5), x_dir=(0, -1, 0), z_dir=(0, 0, 1))) as fillet_3_piece_22a_section:
        with BuildLine():
            CenterArc((FILLET_3_R, -FILLET_3_R), FILLET_3_R, 90, 90)
            Line((0, -FILLET_3_R), (-FILLET_3_R * 0.02, -FILLET_3_R))
            Line((-FILLET_3_R * 0.02, -FILLET_3_R), (-FILLET_3_R * 0.02, FILLET_3_R * 0.02))
            Line((-FILLET_3_R * 0.02, FILLET_3_R * 0.02), (FILLET_3_R, FILLET_3_R * 0.02))
            Line((FILLET_3_R, FILLET_3_R * 0.02), (FILLET_3_R, 0))
        make_face()
    fillet_3_piece_22a = extrude(amount=23.5, mode=Mode.PRIVATE)
    fillet_3_piece_22a = split(fillet_3_piece_22a, bisect_by=Plane(origin=(11.454720977, 7.954720977, -12), z_dir=(0, 0, -1)), keep=Keep.TOP, mode=Mode.PRIVATE)
    with BuildSketch(Plane(origin=(11.5, 0.2, -12), x_dir=(0, 0, 1), z_dir=(0, 1, 0))) as fillet_3_piece_22b_section:
        with BuildLine():
            CenterArc((FILLET_3_R, -FILLET_3_R), FILLET_3_R, 90, 90)
            Line((0, -FILLET_3_R), (-FILLET_3_R * 0.02, -FILLET_3_R))
            Line((-FILLET_3_R * 0.02, -FILLET_3_R), (-FILLET_3_R * 0.02, FILLET_3_R * 0.02))
            Line((-FILLET_3_R * 0.02, FILLET_3_R * 0.02), (FILLET_3_R, FILLET_3_R * 0.02))
            Line((FILLET_3_R, FILLET_3_R * 0.02), (FILLET_3_R, 0))
        make_face()
    fillet_3_piece_22b = extrude(amount=8.3, mode=Mode.PRIVATE)
    fillet_3_piece_22b = split(fillet_3_piece_22b, bisect_by=Plane(origin=(11.454720977, 8, -11.954720977), z_dir=(0, 1, 0)), keep=Keep.TOP, mode=Mode.PRIVATE)
    fillet_3_piece_22 = fillet_3_piece_22a & fillet_3_piece_22b
    add(fillet_3_piece_22, mode=Mode.SUBTRACT)
    with BuildSketch(Plane(origin=(-10, 7, 12), x_dir=(-1, 0, 0), z_dir=(0, -1, 0))) as fillet_3_piece_23a_section:
        with BuildLine():
            CenterArc((FILLET_3_R, FILLET_3_R), FILLET_3_R, 180, 90)
            Line((0, FILLET_3_R), (-FILLET_3_R * 0.02, FILLET_3_R))
            Line((-FILLET_3_R * 0.02, FILLET_3_R), (-FILLET_3_R * 0.02, -FILLET_3_R * 0.02))
            Line((-FILLET_3_R * 0.02, -FILLET_3_R * 0.02), (FILLET_3_R, -FILLET_3_R * 0.02))
            Line((FILLET_3_R, -FILLET_3_R * 0.02), (FILLET_3_R, 0))
        make_face()
    fillet_3_piece_23a = extrude(amount=5.5, mode=Mode.PRIVATE)
    fillet_3_piece_23a = split(fillet_3_piece_23a, bisect_by=Plane(origin=(-10.045279023, 2, 11.954720977), z_dir=(0, -1, 0)), keep=Keep.TOP, mode=Mode.PRIVATE)
    with BuildSketch(Plane(origin=(-10.5, 2, 12), x_dir=(0, -1, 0), z_dir=(1, 0, 0))) as fillet_3_piece_23b_section:
        with BuildLine():
            CenterArc((FILLET_3_R, FILLET_3_R), FILLET_3_R, 180, 90)
            Line((0, FILLET_3_R), (-FILLET_3_R * 0.02, FILLET_3_R))
            Line((-FILLET_3_R * 0.02, FILLET_3_R), (-FILLET_3_R * 0.02, -FILLET_3_R * 0.02))
            Line((-FILLET_3_R * 0.02, -FILLET_3_R * 0.02), (FILLET_3_R, -FILLET_3_R * 0.02))
            Line((FILLET_3_R, -FILLET_3_R * 0.02), (FILLET_3_R, 0))
        make_face()
    fillet_3_piece_23b = extrude(amount=20.5, mode=Mode.PRIVATE)
    fillet_3_piece_23b = split(fillet_3_piece_23b, bisect_by=Plane(origin=(-10, 1.954720977, 11.954720977), z_dir=(-1, 0, 0)), keep=Keep.TOP, mode=Mode.PRIVATE)
    fillet_3_piece_23 = fillet_3_piece_23a & fillet_3_piece_23b
    add(fillet_3_piece_23, mode=Mode.SUBTRACT)
    with BuildSketch(Plane(origin=(-10, 2, 12), x_dir=(0, -1, 0), z_dir=(1, 0, 0))) as fillet_3_piece_24a_section:
        with BuildLine():
            CenterArc((FILLET_3_R, FILLET_3_R), FILLET_3_R, 180, 90)
            Line((0, FILLET_3_R), (-FILLET_3_R * 0.02, FILLET_3_R))
            Line((-FILLET_3_R * 0.02, FILLET_3_R), (-FILLET_3_R * 0.02, -FILLET_3_R * 0.02))
            Line((-FILLET_3_R * 0.02, -FILLET_3_R * 0.02), (FILLET_3_R, -FILLET_3_R * 0.02))
            Line((FILLET_3_R, -FILLET_3_R * 0.02), (FILLET_3_R, 0))
        make_face()
    fillet_3_piece_24a = extrude(amount=20.5, mode=Mode.PRIVATE)
    fillet_3_piece_24a = split(fillet_3_piece_24a, bisect_by=Plane(origin=(10, 1.954720977, 11.954720977), z_dir=(1, 0, 0)), keep=Keep.TOP, mode=Mode.PRIVATE)
    with BuildSketch(Plane(origin=(10, 7, 12), x_dir=(1, 0, 0), z_dir=(0, -1, 0))) as fillet_3_piece_24b_section:
        with BuildLine():
            CenterArc((FILLET_3_R, -FILLET_3_R), FILLET_3_R, 90, 90)
            Line((0, -FILLET_3_R), (-FILLET_3_R * 0.02, -FILLET_3_R))
            Line((-FILLET_3_R * 0.02, -FILLET_3_R), (-FILLET_3_R * 0.02, FILLET_3_R * 0.02))
            Line((-FILLET_3_R * 0.02, FILLET_3_R * 0.02), (FILLET_3_R, FILLET_3_R * 0.02))
            Line((FILLET_3_R, FILLET_3_R * 0.02), (FILLET_3_R, 0))
        make_face()
    fillet_3_piece_24b = extrude(amount=5.5, mode=Mode.PRIVATE)
    fillet_3_piece_24b = split(fillet_3_piece_24b, bisect_by=Plane(origin=(10.045279023, 2, 11.954720977), z_dir=(0, -1, 0)), keep=Keep.TOP, mode=Mode.PRIVATE)
    fillet_3_piece_24 = fillet_3_piece_24a & fillet_3_piece_24b
    add(fillet_3_piece_24, mode=Mode.SUBTRACT)

    # 圆角4
    fillet_4_edges = [part.edges().sort_by_distance(p)[0] for p in [
        (-10, 17.162003053, -15.334696397),
        (-9.707106781, 26.98846913, -18.911237557),
        (0, 27.263698726, -19.011412938),
        (9.707106781, 26.98846913, -18.911237557),
        (-10, 17.483396858, -13.451674176),
        (-9.707106781, 27.631256739, -17.145193114),
        (0, 27.906486336, -17.245368495),
        (9.707106781, 27.631256739, -17.145193114),
        (10, 17.162003053, -15.334696397),
        (10, 17.483396858, -13.451674176),
    ]]
    fillet(fillet_4_edges, radius=FILLET_4_R)

    # 圆角6
    fillet_6_edges = [part.edges().sort_by_distance(p)[0] for p in [
        (1.466025404, -2.5, 1),
        (-1.708012702, -2.5, -6.5),
        (-1.466025404, -2.5, 1),
        (-1.95, -2.5, 1),
        (1.708012702, -2.5, -6.5),
        (1.95, -2.5, 1),
        (1.708012702, -2.5, 8.5),
        (-1.708012702, -2.5, 8.5),
    ]]
    fillet(fillet_6_edges, radius=FILLET_6_R)


solid = part.part
